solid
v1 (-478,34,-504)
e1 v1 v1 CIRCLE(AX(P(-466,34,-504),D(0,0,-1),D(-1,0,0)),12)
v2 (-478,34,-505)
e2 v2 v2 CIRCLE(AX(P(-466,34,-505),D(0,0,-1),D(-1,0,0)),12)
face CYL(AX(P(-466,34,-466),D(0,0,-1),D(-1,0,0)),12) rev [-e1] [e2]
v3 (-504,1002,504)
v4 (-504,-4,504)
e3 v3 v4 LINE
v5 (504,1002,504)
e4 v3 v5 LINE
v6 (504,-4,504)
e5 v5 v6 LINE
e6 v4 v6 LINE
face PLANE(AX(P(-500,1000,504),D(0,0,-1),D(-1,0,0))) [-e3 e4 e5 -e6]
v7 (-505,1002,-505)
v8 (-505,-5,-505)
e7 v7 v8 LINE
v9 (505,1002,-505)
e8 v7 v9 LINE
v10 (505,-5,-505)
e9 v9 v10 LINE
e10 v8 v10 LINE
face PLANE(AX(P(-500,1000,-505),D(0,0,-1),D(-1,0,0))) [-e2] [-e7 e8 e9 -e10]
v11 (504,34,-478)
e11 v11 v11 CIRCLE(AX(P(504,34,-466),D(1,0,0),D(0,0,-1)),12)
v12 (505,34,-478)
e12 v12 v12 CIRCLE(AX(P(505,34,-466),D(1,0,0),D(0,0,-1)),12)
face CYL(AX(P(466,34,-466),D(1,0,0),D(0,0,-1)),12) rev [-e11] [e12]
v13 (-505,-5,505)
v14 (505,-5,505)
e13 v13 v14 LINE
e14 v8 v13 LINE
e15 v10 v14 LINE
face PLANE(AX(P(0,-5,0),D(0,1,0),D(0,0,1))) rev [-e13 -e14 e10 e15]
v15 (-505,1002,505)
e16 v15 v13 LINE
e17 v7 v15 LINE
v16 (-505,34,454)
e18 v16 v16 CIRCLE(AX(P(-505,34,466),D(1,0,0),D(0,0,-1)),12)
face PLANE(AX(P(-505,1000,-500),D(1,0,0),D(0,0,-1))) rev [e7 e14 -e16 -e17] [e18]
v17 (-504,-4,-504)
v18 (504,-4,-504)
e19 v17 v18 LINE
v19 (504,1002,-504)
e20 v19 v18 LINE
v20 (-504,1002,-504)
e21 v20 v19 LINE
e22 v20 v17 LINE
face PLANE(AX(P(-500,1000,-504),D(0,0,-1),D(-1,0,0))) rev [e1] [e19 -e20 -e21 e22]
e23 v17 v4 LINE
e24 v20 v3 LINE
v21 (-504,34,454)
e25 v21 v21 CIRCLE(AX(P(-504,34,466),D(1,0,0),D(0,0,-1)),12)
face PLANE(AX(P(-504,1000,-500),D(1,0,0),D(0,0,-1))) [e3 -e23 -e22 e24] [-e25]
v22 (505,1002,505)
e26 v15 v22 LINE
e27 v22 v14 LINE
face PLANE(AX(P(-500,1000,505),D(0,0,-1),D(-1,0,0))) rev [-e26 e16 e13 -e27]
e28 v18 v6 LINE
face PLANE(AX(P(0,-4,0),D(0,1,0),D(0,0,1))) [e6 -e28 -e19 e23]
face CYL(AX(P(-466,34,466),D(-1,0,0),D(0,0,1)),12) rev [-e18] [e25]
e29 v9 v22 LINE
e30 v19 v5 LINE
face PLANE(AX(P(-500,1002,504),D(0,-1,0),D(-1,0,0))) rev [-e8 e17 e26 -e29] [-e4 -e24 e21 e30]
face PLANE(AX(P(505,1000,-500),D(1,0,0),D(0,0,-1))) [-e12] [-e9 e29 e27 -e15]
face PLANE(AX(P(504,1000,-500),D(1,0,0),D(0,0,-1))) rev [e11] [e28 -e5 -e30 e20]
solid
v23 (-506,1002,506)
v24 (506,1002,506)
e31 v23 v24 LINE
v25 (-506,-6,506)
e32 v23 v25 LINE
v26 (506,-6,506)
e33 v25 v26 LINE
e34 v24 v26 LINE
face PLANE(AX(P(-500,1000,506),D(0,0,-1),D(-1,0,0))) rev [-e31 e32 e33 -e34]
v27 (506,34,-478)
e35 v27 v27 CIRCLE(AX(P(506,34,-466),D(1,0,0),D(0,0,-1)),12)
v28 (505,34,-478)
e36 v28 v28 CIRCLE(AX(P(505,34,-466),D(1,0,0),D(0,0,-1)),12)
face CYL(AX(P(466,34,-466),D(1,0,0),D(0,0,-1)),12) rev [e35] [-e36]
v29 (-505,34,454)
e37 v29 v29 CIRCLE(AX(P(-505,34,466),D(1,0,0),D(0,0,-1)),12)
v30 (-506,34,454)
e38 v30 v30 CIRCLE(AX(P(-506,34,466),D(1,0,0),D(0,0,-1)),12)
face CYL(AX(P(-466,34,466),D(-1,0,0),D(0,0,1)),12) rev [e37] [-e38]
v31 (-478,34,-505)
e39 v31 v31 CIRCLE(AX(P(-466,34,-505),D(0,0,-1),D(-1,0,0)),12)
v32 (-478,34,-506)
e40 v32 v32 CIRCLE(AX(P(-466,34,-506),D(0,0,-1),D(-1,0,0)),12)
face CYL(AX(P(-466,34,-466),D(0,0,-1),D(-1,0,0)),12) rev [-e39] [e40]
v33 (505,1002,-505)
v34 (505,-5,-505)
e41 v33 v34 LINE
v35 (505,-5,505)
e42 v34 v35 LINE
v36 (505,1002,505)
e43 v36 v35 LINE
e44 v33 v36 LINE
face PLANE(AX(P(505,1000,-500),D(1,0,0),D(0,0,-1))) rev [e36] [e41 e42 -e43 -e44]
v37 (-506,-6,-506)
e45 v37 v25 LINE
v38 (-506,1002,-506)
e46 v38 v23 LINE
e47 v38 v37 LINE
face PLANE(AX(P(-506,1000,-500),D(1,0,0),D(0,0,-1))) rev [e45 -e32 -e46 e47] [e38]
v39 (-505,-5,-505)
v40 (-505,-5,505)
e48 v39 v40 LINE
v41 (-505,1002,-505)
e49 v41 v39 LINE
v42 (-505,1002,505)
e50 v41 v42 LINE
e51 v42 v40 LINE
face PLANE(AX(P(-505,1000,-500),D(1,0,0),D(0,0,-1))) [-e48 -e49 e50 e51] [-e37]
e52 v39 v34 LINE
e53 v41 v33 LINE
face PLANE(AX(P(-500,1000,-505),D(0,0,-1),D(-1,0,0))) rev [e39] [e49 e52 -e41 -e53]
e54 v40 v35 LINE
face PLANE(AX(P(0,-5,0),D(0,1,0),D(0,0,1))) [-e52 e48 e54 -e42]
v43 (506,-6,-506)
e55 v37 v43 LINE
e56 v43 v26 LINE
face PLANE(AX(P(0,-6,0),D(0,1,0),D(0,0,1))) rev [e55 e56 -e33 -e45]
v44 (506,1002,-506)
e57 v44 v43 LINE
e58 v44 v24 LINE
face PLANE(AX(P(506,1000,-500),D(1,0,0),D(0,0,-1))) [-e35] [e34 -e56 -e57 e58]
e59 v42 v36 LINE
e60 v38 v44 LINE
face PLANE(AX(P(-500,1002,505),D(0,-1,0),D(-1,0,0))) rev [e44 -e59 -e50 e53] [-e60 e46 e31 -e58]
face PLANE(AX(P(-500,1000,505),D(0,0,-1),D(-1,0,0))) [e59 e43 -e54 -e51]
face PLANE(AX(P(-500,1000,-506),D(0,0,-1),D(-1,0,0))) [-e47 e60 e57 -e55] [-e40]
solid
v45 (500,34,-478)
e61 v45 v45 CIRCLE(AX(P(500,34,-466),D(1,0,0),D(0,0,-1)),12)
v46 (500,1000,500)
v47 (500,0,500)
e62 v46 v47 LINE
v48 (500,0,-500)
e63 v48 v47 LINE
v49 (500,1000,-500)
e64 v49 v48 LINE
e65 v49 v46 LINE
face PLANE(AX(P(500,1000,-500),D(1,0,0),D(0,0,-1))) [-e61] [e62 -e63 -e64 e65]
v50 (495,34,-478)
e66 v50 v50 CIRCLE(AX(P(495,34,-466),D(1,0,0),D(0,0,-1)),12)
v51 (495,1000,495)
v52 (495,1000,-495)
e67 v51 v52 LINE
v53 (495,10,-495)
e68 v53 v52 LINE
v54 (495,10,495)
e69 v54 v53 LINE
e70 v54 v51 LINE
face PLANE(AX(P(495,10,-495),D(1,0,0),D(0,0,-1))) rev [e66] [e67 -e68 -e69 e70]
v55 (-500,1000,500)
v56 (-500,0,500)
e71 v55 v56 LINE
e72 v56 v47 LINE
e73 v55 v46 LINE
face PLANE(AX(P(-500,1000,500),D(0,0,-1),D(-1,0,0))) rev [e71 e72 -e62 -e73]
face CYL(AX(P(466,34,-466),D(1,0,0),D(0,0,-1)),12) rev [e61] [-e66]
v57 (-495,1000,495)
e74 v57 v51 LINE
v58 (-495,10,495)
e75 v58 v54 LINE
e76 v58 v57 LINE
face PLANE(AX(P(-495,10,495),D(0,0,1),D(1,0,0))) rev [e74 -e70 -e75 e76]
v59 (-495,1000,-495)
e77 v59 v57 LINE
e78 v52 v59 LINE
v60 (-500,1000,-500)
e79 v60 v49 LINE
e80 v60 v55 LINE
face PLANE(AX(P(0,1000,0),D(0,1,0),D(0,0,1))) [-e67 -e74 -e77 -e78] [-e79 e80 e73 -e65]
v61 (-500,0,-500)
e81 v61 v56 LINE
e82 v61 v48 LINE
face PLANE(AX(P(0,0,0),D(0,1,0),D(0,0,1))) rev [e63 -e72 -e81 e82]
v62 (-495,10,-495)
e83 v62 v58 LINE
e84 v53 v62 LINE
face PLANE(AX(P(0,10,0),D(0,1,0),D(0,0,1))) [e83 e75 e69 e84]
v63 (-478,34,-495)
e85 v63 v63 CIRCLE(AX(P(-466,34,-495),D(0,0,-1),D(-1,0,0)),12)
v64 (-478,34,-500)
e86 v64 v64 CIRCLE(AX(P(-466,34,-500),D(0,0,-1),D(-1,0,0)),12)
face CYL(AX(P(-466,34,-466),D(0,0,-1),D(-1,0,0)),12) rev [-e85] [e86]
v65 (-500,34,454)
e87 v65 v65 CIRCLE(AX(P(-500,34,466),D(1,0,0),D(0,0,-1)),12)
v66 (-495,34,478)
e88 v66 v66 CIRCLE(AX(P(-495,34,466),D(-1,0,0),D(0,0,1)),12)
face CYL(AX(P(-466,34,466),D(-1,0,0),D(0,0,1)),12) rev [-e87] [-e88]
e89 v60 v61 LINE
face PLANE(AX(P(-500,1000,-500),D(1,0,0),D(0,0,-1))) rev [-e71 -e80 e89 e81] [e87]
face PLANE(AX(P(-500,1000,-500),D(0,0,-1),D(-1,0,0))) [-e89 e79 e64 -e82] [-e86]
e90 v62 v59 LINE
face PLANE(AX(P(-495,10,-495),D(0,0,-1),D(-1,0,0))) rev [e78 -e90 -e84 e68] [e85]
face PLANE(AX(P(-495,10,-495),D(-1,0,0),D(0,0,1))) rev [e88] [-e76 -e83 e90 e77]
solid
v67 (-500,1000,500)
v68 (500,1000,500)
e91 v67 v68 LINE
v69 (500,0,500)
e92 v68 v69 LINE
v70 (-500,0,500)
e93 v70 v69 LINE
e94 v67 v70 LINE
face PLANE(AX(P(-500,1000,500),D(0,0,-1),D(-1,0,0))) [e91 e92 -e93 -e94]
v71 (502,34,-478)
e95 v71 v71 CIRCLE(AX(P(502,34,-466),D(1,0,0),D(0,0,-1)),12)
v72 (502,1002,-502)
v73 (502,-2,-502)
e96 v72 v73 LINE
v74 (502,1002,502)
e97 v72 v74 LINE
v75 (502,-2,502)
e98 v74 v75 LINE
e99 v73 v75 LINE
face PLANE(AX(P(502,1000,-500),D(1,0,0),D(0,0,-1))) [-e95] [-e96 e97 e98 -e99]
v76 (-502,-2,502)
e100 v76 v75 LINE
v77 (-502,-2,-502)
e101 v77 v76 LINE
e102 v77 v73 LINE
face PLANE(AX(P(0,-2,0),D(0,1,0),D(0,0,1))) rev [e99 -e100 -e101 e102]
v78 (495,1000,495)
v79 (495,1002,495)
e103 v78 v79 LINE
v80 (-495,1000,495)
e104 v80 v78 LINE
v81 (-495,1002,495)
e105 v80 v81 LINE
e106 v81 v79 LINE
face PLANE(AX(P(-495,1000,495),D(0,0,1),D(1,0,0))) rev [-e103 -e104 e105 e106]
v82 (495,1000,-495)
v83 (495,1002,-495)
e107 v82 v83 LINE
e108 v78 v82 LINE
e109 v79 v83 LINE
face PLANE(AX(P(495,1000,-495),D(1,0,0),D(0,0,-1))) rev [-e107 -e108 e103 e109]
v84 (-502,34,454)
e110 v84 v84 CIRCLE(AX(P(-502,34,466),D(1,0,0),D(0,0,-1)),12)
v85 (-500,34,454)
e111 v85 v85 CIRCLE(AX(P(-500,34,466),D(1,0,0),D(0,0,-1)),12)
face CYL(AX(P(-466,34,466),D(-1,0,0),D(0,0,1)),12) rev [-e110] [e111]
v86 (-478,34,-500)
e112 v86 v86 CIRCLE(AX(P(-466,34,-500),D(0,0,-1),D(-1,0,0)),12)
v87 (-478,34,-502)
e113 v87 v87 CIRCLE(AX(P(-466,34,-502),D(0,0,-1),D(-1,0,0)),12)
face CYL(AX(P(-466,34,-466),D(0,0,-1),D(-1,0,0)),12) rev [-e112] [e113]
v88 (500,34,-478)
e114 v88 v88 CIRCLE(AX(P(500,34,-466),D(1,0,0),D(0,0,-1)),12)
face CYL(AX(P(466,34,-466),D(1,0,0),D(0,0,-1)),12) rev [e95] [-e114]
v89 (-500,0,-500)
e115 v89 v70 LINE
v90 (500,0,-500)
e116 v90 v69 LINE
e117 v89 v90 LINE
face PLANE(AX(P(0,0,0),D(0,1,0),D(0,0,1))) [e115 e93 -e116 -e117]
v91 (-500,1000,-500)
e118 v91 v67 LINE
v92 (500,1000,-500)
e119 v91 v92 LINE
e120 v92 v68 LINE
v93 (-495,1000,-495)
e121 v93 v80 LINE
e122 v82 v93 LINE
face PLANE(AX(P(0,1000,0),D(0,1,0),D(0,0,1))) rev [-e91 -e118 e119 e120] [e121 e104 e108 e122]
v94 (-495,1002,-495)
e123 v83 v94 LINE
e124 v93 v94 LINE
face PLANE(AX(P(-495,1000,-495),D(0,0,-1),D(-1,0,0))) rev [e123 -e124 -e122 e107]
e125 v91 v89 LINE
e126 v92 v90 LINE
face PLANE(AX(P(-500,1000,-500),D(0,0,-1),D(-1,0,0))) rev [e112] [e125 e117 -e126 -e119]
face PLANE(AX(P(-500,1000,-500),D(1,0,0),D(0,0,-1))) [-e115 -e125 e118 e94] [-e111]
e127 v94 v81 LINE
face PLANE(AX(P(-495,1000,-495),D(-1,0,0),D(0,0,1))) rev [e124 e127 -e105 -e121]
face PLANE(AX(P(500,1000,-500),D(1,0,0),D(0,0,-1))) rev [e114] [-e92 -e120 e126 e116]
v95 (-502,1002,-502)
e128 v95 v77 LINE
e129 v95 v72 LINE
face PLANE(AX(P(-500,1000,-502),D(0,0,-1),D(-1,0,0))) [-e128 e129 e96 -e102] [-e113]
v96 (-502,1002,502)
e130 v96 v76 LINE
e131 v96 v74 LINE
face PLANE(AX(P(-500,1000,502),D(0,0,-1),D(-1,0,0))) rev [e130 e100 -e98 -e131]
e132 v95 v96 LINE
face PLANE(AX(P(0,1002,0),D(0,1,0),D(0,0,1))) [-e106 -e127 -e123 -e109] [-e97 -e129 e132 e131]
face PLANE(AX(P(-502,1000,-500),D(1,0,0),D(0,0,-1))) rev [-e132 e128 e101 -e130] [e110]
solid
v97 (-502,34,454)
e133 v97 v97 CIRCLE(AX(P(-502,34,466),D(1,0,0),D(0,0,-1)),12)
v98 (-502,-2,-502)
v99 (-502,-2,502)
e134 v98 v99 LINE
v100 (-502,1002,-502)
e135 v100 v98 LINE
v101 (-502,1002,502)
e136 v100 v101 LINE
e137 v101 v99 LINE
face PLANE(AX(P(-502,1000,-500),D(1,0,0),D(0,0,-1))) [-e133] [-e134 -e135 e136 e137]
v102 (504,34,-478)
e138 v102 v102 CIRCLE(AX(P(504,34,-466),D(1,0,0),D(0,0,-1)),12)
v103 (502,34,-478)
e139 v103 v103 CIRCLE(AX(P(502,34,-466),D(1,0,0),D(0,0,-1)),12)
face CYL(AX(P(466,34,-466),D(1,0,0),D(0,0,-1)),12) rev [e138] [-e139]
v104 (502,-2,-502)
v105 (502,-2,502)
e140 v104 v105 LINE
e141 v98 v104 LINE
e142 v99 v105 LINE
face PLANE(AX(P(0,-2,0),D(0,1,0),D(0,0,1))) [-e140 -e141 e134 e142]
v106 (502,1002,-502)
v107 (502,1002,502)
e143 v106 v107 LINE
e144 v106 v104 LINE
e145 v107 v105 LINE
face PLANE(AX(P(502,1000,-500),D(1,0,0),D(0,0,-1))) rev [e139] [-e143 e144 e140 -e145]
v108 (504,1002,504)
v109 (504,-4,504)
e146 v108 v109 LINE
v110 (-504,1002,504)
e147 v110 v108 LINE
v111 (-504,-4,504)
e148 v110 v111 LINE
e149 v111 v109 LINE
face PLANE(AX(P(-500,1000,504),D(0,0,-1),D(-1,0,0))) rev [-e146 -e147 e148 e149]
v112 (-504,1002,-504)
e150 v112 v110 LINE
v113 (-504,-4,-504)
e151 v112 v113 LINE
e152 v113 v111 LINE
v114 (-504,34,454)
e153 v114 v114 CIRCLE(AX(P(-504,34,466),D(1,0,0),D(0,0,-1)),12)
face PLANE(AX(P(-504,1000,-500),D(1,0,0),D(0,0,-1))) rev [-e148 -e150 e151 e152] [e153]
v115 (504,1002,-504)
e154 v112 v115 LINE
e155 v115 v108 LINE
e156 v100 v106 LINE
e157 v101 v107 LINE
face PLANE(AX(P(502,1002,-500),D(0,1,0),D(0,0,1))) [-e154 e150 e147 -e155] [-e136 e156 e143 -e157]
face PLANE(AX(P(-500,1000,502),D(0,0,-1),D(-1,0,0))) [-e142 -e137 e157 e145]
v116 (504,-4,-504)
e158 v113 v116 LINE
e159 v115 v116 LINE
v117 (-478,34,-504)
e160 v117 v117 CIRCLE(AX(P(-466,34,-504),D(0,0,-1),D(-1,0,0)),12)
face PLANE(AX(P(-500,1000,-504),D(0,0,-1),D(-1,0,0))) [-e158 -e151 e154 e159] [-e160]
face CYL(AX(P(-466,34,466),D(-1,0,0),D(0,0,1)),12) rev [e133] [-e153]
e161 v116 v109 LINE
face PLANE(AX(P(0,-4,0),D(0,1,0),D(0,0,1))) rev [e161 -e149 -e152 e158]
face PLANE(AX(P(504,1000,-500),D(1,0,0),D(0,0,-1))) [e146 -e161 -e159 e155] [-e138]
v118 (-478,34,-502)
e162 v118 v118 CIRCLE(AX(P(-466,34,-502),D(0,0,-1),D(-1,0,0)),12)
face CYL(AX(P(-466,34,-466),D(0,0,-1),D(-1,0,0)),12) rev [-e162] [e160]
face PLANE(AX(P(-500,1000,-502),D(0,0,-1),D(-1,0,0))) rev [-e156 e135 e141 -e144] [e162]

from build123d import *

# Parameters (mm, degrees)
SKETCH1_W              = 1000
SKETCH1_H              = 1000
BOSS_EXTRUDE1_DEPTH    = 1000
SKETCH2_W              = 990
SKETCH2_H              = 990
CUT_EXTRUDE1_DEPTH     = 990
PRIMER_START           = -2
PRIMER_1_OUTLINE_W     = 1004
PRIMER_1_OUTLINE_H     = 1004
PRIMER_1_OUTLINE_W_2   = 1000
PRIMER_1_OUTLINE_H_2   = 1000
PRIMER_1_DEPTH         = 1004
PRIMER_1_2_OUTLINE_W   = 1000
PRIMER_1_2_OUTLINE_H   = 1000
PRIMER_1_2_DEPTH       = 2
PRIMER_START_2         = 1000
PRIMER_1_3_OUTLINE_W   = 1000
PRIMER_1_3_OUTLINE_H   = 1000
PRIMER_1_3_OUTLINE_W_2 = 990
PRIMER_1_3_OUTLINE_H_2 = 990
PRIMER_1_3_DEPTH       = 2
PRIMER_START_3         = -504
PRIMER_2_DEPTH         = 1008
PRIMER_2_2_OUTLINE_W   = 1004
PRIMER_2_2_OUTLINE_H   = 1004
PRIMER_2_2_DEPTH       = 2
PRIMER_START_4         = 502
PRIMER_2_3_OUTLINE_W   = 1004
PRIMER_2_3_OUTLINE_H   = 1004
PRIMER_2_3_DEPTH       = 2
PAINT_START            = -5
PAINT_1_OUTLINE_W      = 1010
PAINT_1_OUTLINE_H      = 1010
PAINT_1_OUTLINE_W_2    = 1008
PAINT_1_OUTLINE_H_2    = 1008
PAINT_1_DEPTH          = 1007
PAINT_1_2_OUTLINE_W    = 1008
PAINT_1_2_OUTLINE_H    = 1008
PAINT_1_2_DEPTH        = 1
PAINT_START_2          = -506
PAINT_2_DEPTH          = 1012
PAINT_2_2_OUTLINE_W    = 1007
PAINT_2_2_OUTLINE_H    = 1010
PAINT_2_2_DEPTH        = 1
PAINT_START_3          = 505
PAINT_2_3_OUTLINE_W    = 1007
PAINT_2_3_OUTLINE_H    = 1010
PAINT_2_3_DEPTH        = 1
SKETCH3_R              = 12
CUT_EXTRUDE2_DEPTH     = 40
SKETCH4_R              = 12
CUT_EXTRUDE3_DEPTH     = 40
SKETCH5_R              = 12
CUT_EXTRUDE4_DEPTH     = 40


# Read off the part's stored shape, not the designer's step: Primer 1, Primer 2, Paint 1, Paint 2
with BuildPart() as part:
    # Sketch1 → Boss-Extrude1 (new body)
    with BuildSketch(Plane(origin=(0, 0, 0), x_dir=(1, 0, 0), z_dir=(0, 1, 0))):
        Rectangle(SKETCH1_W, SKETCH1_H)
    extrude(amount=BOSS_EXTRUDE1_DEPTH)

    # Sketch2 → Cut-Extrude1 (cut)
    with BuildSketch(Plane(origin=(0, 1000, 0), x_dir=(1, 0, 0), z_dir=(0, 1, 0))):
        Rectangle(SKETCH2_W, SKETCH2_H)
    extrude(amount=-CUT_EXTRUDE1_DEPTH, mode=Mode.SUBTRACT)


with BuildPart() as body_2:
    # Primer 1 outline → Primer 1 (new body)
    with BuildSketch(Plane(origin=(0, 0, 0), x_dir=(1, 0, 0), z_dir=(0, 1, 0)).offset(PRIMER_START)):
        Rectangle(PRIMER_1_OUTLINE_W, PRIMER_1_OUTLINE_H)
        Rectangle(PRIMER_1_OUTLINE_W_2, PRIMER_1_OUTLINE_H_2, mode=Mode.SUBTRACT)
    extrude(amount=PRIMER_1_DEPTH)

    # Primer 1 2 outline → Primer 1 2 (add)
    with BuildSketch(Plane(origin=(0, 0, 0), x_dir=(1, 0, 0), z_dir=(0, 1, 0)).offset(PRIMER_START)):
        Rectangle(PRIMER_1_2_OUTLINE_W, PRIMER_1_2_OUTLINE_H)
    extrude(amount=PRIMER_1_2_DEPTH)

    # Primer 1 3 outline → Primer 1 3 (add)
    with BuildSketch(Plane(origin=(0, 0, 0), x_dir=(1, 0, 0), z_dir=(0, 1, 0)).offset(PRIMER_START_2)):
        Rectangle(PRIMER_1_3_OUTLINE_W, PRIMER_1_3_OUTLINE_H)
        Rectangle(PRIMER_1_3_OUTLINE_W_2, PRIMER_1_3_OUTLINE_H_2, mode=Mode.SUBTRACT)
    extrude(amount=PRIMER_1_3_DEPTH)


with BuildPart() as body_3:
    # Primer 2 outline → Primer 2 (new body)
    with BuildSketch(Plane.XY.offset(PRIMER_START_3)):
        Polygon((-504, -4), (504, -4), (504, 1002), (502, 1002), (502, -2), (-502, -2), (-502, 1002), (-504, 1002), align=None)
    extrude(amount=PRIMER_2_DEPTH)

    # Primer 2 2 outline → Primer 2 2 (add)
    with BuildSketch(Plane.XY.offset(PRIMER_START_3)):
        with Locations((0, 500)):
            Rectangle(PRIMER_2_2_OUTLINE_W, PRIMER_2_2_OUTLINE_H)
    extrude(amount=PRIMER_2_2_DEPTH)

    # Primer 2 3 outline → Primer 2 3 (add)
    with BuildSketch(Plane.XY.offset(PRIMER_START_4)):
        with Locations((0, 500)):
            Rectangle(PRIMER_2_3_OUTLINE_W, PRIMER_2_3_OUTLINE_H)
    extrude(amount=PRIMER_2_3_DEPTH)


with BuildPart() as body_4:
    # Paint 1 outline → Paint 1 (new body)
    with BuildSketch(Plane(origin=(0, 0, 0), x_dir=(1, 0, 0), z_dir=(0, 1, 0)).offset(PAINT_START)):
        Rectangle(PAINT_1_OUTLINE_W, PAINT_1_OUTLINE_H)
        Rectangle(PAINT_1_OUTLINE_W_2, PAINT_1_OUTLINE_H_2, mode=Mode.SUBTRACT)
    extrude(amount=PAINT_1_DEPTH)

    # Paint 1 2 outline → Paint 1 2 (add)
    with BuildSketch(Plane(origin=(0, 0, 0), x_dir=(1, 0, 0), z_dir=(0, 1, 0)).offset(PAINT_START)):
        Rectangle(PAINT_1_2_OUTLINE_W, PAINT_1_2_OUTLINE_H)
    extrude(amount=PAINT_1_2_DEPTH)


with BuildPart() as body_5:
    # Paint 2 outline → Paint 2 (new body)
    with BuildSketch(Plane.YZ.offset(PAINT_START_2)):
        Polygon((1002, 506), (-6, 506), (-6, -506), (1002, -506), (1002, -505), (-5, -505), (-5, 505), (1002, 505), align=None)
    extrude(amount=PAINT_2_DEPTH)

    # Paint 2 2 outline → Paint 2 2 (add)
    with BuildSketch(Plane.YZ.offset(PAINT_START_2)):
        with Locations((498.5, 0)):
            Rectangle(PAINT_2_2_OUTLINE_W, PAINT_2_2_OUTLINE_H)
    extrude(amount=PAINT_2_2_DEPTH)

    # Paint 2 3 outline → Paint 2 3 (add)
    with BuildSketch(Plane.YZ.offset(PAINT_START_3)):
        with Locations((498.5, 0)):
            Rectangle(PAINT_2_3_OUTLINE_W, PAINT_2_3_OUTLINE_H)
    extrude(amount=PAINT_2_3_DEPTH)


with BuildPart() as cut_extrude2_tool:
    # Sketch3 → Cut-Extrude2 (new, symmetric)
    with BuildSketch(Plane(origin=(506, 0, 0), x_dir=(0, 0, -1), z_dir=(1, 0, 0))):
        with Locations((466, 34)):
            Circle(SKETCH3_R)
    extrude(amount=CUT_EXTRUDE2_DEPTH, both=True)


with BuildPart() as part_1:
    add(part.part)

    # Cut-Extrude2: cut by cut_extrude2_tool
    add(cut_extrude2_tool.part, mode=Mode.SUBTRACT)


with BuildPart() as body_2_1:
    add(body_2.part)

    # Cut-Extrude2: cut by cut_extrude2_tool
    add(cut_extrude2_tool.part, mode=Mode.SUBTRACT)


with BuildPart() as body_3_1:
    add(body_3.part)

    # Cut-Extrude2: cut by cut_extrude2_tool
    add(cut_extrude2_tool.part, mode=Mode.SUBTRACT)


with BuildPart() as body_4_1:
    add(body_4.part)

    # Cut-Extrude2: cut by cut_extrude2_tool
    add(cut_extrude2_tool.part, mode=Mode.SUBTRACT)


with BuildPart() as body_5_1:
    add(body_5.part)

    # Cut-Extrude2: cut by cut_extrude2_tool
    add(cut_extrude2_tool.part, mode=Mode.SUBTRACT)


with BuildPart() as cut_extrude3_tool:
    # Sketch4 → Cut-Extrude3 (new, symmetric)
    with BuildSketch(Plane(origin=(0, 0, -506), x_dir=(-1, 0, 0), z_dir=(0, 0, -1))):
        with Locations((466, 34)):
            Circle(SKETCH4_R)
    extrude(amount=CUT_EXTRUDE3_DEPTH, both=True)


with BuildPart() as part_2:
    add(part_1.part)

    # Cut-Extrude3: cut by cut_extrude3_tool
    add(cut_extrude3_tool.part, mode=Mode.SUBTRACT)


with BuildPart() as body_2_2:
    add(body_2_1.part)

    # Cut-Extrude3: cut by cut_extrude3_tool
    add(cut_extrude3_tool.part, mode=Mode.SUBTRACT)


with BuildPart() as body_3_2:
    add(body_3_1.part)

    # Cut-Extrude3: cut by cut_extrude3_tool
    add(cut_extrude3_tool.part, mode=Mode.SUBTRACT)


with BuildPart() as body_4_2:
    add(body_4_1.part)

    # Cut-Extrude3: cut by cut_extrude3_tool
    add(cut_extrude3_tool.part, mode=Mode.SUBTRACT)


with BuildPart() as body_5_2:
    add(body_5_1.part)

    # Cut-Extrude3: cut by cut_extrude3_tool
    add(cut_extrude3_tool.part, mode=Mode.SUBTRACT)


with BuildPart() as cut_extrude4_tool:
    # Sketch5 → Cut-Extrude4 (new, symmetric)
    with BuildSketch(Plane.ZY.offset(506)):
        with Locations(Location((466, 34, 0), (0, 0, 180))):
            Circle(SKETCH5_R)
    extrude(amount=CUT_EXTRUDE4_DEPTH, both=True)


with BuildPart() as part_3:
    add(part_2.part)

    # Cut-Extrude4: cut by cut_extrude4_tool
    add(cut_extrude4_tool.part, mode=Mode.SUBTRACT)


with BuildPart() as body_2_3:
    add(body_2_2.part)

    # Cut-Extrude4: cut by cut_extrude4_tool
    add(cut_extrude4_tool.part, mode=Mode.SUBTRACT)


with BuildPart() as body_3_3:
    add(body_3_2.part)

    # Cut-Extrude4: cut by cut_extrude4_tool
    add(cut_extrude4_tool.part, mode=Mode.SUBTRACT)


with BuildPart() as body_4_3:
    add(body_4_2.part)

    # Cut-Extrude4: cut by cut_extrude4_tool
    add(cut_extrude4_tool.part, mode=Mode.SUBTRACT)


with BuildPart() as body_5_3:
    add(body_5_2.part)

    # Cut-Extrude4: cut by cut_extrude4_tool
    add(cut_extrude4_tool.part, mode=Mode.SUBTRACT)


solid = Compound([part_3.part, body_2_3.part, body_3_3.part, body_4_3.part, body_5_3.part])
